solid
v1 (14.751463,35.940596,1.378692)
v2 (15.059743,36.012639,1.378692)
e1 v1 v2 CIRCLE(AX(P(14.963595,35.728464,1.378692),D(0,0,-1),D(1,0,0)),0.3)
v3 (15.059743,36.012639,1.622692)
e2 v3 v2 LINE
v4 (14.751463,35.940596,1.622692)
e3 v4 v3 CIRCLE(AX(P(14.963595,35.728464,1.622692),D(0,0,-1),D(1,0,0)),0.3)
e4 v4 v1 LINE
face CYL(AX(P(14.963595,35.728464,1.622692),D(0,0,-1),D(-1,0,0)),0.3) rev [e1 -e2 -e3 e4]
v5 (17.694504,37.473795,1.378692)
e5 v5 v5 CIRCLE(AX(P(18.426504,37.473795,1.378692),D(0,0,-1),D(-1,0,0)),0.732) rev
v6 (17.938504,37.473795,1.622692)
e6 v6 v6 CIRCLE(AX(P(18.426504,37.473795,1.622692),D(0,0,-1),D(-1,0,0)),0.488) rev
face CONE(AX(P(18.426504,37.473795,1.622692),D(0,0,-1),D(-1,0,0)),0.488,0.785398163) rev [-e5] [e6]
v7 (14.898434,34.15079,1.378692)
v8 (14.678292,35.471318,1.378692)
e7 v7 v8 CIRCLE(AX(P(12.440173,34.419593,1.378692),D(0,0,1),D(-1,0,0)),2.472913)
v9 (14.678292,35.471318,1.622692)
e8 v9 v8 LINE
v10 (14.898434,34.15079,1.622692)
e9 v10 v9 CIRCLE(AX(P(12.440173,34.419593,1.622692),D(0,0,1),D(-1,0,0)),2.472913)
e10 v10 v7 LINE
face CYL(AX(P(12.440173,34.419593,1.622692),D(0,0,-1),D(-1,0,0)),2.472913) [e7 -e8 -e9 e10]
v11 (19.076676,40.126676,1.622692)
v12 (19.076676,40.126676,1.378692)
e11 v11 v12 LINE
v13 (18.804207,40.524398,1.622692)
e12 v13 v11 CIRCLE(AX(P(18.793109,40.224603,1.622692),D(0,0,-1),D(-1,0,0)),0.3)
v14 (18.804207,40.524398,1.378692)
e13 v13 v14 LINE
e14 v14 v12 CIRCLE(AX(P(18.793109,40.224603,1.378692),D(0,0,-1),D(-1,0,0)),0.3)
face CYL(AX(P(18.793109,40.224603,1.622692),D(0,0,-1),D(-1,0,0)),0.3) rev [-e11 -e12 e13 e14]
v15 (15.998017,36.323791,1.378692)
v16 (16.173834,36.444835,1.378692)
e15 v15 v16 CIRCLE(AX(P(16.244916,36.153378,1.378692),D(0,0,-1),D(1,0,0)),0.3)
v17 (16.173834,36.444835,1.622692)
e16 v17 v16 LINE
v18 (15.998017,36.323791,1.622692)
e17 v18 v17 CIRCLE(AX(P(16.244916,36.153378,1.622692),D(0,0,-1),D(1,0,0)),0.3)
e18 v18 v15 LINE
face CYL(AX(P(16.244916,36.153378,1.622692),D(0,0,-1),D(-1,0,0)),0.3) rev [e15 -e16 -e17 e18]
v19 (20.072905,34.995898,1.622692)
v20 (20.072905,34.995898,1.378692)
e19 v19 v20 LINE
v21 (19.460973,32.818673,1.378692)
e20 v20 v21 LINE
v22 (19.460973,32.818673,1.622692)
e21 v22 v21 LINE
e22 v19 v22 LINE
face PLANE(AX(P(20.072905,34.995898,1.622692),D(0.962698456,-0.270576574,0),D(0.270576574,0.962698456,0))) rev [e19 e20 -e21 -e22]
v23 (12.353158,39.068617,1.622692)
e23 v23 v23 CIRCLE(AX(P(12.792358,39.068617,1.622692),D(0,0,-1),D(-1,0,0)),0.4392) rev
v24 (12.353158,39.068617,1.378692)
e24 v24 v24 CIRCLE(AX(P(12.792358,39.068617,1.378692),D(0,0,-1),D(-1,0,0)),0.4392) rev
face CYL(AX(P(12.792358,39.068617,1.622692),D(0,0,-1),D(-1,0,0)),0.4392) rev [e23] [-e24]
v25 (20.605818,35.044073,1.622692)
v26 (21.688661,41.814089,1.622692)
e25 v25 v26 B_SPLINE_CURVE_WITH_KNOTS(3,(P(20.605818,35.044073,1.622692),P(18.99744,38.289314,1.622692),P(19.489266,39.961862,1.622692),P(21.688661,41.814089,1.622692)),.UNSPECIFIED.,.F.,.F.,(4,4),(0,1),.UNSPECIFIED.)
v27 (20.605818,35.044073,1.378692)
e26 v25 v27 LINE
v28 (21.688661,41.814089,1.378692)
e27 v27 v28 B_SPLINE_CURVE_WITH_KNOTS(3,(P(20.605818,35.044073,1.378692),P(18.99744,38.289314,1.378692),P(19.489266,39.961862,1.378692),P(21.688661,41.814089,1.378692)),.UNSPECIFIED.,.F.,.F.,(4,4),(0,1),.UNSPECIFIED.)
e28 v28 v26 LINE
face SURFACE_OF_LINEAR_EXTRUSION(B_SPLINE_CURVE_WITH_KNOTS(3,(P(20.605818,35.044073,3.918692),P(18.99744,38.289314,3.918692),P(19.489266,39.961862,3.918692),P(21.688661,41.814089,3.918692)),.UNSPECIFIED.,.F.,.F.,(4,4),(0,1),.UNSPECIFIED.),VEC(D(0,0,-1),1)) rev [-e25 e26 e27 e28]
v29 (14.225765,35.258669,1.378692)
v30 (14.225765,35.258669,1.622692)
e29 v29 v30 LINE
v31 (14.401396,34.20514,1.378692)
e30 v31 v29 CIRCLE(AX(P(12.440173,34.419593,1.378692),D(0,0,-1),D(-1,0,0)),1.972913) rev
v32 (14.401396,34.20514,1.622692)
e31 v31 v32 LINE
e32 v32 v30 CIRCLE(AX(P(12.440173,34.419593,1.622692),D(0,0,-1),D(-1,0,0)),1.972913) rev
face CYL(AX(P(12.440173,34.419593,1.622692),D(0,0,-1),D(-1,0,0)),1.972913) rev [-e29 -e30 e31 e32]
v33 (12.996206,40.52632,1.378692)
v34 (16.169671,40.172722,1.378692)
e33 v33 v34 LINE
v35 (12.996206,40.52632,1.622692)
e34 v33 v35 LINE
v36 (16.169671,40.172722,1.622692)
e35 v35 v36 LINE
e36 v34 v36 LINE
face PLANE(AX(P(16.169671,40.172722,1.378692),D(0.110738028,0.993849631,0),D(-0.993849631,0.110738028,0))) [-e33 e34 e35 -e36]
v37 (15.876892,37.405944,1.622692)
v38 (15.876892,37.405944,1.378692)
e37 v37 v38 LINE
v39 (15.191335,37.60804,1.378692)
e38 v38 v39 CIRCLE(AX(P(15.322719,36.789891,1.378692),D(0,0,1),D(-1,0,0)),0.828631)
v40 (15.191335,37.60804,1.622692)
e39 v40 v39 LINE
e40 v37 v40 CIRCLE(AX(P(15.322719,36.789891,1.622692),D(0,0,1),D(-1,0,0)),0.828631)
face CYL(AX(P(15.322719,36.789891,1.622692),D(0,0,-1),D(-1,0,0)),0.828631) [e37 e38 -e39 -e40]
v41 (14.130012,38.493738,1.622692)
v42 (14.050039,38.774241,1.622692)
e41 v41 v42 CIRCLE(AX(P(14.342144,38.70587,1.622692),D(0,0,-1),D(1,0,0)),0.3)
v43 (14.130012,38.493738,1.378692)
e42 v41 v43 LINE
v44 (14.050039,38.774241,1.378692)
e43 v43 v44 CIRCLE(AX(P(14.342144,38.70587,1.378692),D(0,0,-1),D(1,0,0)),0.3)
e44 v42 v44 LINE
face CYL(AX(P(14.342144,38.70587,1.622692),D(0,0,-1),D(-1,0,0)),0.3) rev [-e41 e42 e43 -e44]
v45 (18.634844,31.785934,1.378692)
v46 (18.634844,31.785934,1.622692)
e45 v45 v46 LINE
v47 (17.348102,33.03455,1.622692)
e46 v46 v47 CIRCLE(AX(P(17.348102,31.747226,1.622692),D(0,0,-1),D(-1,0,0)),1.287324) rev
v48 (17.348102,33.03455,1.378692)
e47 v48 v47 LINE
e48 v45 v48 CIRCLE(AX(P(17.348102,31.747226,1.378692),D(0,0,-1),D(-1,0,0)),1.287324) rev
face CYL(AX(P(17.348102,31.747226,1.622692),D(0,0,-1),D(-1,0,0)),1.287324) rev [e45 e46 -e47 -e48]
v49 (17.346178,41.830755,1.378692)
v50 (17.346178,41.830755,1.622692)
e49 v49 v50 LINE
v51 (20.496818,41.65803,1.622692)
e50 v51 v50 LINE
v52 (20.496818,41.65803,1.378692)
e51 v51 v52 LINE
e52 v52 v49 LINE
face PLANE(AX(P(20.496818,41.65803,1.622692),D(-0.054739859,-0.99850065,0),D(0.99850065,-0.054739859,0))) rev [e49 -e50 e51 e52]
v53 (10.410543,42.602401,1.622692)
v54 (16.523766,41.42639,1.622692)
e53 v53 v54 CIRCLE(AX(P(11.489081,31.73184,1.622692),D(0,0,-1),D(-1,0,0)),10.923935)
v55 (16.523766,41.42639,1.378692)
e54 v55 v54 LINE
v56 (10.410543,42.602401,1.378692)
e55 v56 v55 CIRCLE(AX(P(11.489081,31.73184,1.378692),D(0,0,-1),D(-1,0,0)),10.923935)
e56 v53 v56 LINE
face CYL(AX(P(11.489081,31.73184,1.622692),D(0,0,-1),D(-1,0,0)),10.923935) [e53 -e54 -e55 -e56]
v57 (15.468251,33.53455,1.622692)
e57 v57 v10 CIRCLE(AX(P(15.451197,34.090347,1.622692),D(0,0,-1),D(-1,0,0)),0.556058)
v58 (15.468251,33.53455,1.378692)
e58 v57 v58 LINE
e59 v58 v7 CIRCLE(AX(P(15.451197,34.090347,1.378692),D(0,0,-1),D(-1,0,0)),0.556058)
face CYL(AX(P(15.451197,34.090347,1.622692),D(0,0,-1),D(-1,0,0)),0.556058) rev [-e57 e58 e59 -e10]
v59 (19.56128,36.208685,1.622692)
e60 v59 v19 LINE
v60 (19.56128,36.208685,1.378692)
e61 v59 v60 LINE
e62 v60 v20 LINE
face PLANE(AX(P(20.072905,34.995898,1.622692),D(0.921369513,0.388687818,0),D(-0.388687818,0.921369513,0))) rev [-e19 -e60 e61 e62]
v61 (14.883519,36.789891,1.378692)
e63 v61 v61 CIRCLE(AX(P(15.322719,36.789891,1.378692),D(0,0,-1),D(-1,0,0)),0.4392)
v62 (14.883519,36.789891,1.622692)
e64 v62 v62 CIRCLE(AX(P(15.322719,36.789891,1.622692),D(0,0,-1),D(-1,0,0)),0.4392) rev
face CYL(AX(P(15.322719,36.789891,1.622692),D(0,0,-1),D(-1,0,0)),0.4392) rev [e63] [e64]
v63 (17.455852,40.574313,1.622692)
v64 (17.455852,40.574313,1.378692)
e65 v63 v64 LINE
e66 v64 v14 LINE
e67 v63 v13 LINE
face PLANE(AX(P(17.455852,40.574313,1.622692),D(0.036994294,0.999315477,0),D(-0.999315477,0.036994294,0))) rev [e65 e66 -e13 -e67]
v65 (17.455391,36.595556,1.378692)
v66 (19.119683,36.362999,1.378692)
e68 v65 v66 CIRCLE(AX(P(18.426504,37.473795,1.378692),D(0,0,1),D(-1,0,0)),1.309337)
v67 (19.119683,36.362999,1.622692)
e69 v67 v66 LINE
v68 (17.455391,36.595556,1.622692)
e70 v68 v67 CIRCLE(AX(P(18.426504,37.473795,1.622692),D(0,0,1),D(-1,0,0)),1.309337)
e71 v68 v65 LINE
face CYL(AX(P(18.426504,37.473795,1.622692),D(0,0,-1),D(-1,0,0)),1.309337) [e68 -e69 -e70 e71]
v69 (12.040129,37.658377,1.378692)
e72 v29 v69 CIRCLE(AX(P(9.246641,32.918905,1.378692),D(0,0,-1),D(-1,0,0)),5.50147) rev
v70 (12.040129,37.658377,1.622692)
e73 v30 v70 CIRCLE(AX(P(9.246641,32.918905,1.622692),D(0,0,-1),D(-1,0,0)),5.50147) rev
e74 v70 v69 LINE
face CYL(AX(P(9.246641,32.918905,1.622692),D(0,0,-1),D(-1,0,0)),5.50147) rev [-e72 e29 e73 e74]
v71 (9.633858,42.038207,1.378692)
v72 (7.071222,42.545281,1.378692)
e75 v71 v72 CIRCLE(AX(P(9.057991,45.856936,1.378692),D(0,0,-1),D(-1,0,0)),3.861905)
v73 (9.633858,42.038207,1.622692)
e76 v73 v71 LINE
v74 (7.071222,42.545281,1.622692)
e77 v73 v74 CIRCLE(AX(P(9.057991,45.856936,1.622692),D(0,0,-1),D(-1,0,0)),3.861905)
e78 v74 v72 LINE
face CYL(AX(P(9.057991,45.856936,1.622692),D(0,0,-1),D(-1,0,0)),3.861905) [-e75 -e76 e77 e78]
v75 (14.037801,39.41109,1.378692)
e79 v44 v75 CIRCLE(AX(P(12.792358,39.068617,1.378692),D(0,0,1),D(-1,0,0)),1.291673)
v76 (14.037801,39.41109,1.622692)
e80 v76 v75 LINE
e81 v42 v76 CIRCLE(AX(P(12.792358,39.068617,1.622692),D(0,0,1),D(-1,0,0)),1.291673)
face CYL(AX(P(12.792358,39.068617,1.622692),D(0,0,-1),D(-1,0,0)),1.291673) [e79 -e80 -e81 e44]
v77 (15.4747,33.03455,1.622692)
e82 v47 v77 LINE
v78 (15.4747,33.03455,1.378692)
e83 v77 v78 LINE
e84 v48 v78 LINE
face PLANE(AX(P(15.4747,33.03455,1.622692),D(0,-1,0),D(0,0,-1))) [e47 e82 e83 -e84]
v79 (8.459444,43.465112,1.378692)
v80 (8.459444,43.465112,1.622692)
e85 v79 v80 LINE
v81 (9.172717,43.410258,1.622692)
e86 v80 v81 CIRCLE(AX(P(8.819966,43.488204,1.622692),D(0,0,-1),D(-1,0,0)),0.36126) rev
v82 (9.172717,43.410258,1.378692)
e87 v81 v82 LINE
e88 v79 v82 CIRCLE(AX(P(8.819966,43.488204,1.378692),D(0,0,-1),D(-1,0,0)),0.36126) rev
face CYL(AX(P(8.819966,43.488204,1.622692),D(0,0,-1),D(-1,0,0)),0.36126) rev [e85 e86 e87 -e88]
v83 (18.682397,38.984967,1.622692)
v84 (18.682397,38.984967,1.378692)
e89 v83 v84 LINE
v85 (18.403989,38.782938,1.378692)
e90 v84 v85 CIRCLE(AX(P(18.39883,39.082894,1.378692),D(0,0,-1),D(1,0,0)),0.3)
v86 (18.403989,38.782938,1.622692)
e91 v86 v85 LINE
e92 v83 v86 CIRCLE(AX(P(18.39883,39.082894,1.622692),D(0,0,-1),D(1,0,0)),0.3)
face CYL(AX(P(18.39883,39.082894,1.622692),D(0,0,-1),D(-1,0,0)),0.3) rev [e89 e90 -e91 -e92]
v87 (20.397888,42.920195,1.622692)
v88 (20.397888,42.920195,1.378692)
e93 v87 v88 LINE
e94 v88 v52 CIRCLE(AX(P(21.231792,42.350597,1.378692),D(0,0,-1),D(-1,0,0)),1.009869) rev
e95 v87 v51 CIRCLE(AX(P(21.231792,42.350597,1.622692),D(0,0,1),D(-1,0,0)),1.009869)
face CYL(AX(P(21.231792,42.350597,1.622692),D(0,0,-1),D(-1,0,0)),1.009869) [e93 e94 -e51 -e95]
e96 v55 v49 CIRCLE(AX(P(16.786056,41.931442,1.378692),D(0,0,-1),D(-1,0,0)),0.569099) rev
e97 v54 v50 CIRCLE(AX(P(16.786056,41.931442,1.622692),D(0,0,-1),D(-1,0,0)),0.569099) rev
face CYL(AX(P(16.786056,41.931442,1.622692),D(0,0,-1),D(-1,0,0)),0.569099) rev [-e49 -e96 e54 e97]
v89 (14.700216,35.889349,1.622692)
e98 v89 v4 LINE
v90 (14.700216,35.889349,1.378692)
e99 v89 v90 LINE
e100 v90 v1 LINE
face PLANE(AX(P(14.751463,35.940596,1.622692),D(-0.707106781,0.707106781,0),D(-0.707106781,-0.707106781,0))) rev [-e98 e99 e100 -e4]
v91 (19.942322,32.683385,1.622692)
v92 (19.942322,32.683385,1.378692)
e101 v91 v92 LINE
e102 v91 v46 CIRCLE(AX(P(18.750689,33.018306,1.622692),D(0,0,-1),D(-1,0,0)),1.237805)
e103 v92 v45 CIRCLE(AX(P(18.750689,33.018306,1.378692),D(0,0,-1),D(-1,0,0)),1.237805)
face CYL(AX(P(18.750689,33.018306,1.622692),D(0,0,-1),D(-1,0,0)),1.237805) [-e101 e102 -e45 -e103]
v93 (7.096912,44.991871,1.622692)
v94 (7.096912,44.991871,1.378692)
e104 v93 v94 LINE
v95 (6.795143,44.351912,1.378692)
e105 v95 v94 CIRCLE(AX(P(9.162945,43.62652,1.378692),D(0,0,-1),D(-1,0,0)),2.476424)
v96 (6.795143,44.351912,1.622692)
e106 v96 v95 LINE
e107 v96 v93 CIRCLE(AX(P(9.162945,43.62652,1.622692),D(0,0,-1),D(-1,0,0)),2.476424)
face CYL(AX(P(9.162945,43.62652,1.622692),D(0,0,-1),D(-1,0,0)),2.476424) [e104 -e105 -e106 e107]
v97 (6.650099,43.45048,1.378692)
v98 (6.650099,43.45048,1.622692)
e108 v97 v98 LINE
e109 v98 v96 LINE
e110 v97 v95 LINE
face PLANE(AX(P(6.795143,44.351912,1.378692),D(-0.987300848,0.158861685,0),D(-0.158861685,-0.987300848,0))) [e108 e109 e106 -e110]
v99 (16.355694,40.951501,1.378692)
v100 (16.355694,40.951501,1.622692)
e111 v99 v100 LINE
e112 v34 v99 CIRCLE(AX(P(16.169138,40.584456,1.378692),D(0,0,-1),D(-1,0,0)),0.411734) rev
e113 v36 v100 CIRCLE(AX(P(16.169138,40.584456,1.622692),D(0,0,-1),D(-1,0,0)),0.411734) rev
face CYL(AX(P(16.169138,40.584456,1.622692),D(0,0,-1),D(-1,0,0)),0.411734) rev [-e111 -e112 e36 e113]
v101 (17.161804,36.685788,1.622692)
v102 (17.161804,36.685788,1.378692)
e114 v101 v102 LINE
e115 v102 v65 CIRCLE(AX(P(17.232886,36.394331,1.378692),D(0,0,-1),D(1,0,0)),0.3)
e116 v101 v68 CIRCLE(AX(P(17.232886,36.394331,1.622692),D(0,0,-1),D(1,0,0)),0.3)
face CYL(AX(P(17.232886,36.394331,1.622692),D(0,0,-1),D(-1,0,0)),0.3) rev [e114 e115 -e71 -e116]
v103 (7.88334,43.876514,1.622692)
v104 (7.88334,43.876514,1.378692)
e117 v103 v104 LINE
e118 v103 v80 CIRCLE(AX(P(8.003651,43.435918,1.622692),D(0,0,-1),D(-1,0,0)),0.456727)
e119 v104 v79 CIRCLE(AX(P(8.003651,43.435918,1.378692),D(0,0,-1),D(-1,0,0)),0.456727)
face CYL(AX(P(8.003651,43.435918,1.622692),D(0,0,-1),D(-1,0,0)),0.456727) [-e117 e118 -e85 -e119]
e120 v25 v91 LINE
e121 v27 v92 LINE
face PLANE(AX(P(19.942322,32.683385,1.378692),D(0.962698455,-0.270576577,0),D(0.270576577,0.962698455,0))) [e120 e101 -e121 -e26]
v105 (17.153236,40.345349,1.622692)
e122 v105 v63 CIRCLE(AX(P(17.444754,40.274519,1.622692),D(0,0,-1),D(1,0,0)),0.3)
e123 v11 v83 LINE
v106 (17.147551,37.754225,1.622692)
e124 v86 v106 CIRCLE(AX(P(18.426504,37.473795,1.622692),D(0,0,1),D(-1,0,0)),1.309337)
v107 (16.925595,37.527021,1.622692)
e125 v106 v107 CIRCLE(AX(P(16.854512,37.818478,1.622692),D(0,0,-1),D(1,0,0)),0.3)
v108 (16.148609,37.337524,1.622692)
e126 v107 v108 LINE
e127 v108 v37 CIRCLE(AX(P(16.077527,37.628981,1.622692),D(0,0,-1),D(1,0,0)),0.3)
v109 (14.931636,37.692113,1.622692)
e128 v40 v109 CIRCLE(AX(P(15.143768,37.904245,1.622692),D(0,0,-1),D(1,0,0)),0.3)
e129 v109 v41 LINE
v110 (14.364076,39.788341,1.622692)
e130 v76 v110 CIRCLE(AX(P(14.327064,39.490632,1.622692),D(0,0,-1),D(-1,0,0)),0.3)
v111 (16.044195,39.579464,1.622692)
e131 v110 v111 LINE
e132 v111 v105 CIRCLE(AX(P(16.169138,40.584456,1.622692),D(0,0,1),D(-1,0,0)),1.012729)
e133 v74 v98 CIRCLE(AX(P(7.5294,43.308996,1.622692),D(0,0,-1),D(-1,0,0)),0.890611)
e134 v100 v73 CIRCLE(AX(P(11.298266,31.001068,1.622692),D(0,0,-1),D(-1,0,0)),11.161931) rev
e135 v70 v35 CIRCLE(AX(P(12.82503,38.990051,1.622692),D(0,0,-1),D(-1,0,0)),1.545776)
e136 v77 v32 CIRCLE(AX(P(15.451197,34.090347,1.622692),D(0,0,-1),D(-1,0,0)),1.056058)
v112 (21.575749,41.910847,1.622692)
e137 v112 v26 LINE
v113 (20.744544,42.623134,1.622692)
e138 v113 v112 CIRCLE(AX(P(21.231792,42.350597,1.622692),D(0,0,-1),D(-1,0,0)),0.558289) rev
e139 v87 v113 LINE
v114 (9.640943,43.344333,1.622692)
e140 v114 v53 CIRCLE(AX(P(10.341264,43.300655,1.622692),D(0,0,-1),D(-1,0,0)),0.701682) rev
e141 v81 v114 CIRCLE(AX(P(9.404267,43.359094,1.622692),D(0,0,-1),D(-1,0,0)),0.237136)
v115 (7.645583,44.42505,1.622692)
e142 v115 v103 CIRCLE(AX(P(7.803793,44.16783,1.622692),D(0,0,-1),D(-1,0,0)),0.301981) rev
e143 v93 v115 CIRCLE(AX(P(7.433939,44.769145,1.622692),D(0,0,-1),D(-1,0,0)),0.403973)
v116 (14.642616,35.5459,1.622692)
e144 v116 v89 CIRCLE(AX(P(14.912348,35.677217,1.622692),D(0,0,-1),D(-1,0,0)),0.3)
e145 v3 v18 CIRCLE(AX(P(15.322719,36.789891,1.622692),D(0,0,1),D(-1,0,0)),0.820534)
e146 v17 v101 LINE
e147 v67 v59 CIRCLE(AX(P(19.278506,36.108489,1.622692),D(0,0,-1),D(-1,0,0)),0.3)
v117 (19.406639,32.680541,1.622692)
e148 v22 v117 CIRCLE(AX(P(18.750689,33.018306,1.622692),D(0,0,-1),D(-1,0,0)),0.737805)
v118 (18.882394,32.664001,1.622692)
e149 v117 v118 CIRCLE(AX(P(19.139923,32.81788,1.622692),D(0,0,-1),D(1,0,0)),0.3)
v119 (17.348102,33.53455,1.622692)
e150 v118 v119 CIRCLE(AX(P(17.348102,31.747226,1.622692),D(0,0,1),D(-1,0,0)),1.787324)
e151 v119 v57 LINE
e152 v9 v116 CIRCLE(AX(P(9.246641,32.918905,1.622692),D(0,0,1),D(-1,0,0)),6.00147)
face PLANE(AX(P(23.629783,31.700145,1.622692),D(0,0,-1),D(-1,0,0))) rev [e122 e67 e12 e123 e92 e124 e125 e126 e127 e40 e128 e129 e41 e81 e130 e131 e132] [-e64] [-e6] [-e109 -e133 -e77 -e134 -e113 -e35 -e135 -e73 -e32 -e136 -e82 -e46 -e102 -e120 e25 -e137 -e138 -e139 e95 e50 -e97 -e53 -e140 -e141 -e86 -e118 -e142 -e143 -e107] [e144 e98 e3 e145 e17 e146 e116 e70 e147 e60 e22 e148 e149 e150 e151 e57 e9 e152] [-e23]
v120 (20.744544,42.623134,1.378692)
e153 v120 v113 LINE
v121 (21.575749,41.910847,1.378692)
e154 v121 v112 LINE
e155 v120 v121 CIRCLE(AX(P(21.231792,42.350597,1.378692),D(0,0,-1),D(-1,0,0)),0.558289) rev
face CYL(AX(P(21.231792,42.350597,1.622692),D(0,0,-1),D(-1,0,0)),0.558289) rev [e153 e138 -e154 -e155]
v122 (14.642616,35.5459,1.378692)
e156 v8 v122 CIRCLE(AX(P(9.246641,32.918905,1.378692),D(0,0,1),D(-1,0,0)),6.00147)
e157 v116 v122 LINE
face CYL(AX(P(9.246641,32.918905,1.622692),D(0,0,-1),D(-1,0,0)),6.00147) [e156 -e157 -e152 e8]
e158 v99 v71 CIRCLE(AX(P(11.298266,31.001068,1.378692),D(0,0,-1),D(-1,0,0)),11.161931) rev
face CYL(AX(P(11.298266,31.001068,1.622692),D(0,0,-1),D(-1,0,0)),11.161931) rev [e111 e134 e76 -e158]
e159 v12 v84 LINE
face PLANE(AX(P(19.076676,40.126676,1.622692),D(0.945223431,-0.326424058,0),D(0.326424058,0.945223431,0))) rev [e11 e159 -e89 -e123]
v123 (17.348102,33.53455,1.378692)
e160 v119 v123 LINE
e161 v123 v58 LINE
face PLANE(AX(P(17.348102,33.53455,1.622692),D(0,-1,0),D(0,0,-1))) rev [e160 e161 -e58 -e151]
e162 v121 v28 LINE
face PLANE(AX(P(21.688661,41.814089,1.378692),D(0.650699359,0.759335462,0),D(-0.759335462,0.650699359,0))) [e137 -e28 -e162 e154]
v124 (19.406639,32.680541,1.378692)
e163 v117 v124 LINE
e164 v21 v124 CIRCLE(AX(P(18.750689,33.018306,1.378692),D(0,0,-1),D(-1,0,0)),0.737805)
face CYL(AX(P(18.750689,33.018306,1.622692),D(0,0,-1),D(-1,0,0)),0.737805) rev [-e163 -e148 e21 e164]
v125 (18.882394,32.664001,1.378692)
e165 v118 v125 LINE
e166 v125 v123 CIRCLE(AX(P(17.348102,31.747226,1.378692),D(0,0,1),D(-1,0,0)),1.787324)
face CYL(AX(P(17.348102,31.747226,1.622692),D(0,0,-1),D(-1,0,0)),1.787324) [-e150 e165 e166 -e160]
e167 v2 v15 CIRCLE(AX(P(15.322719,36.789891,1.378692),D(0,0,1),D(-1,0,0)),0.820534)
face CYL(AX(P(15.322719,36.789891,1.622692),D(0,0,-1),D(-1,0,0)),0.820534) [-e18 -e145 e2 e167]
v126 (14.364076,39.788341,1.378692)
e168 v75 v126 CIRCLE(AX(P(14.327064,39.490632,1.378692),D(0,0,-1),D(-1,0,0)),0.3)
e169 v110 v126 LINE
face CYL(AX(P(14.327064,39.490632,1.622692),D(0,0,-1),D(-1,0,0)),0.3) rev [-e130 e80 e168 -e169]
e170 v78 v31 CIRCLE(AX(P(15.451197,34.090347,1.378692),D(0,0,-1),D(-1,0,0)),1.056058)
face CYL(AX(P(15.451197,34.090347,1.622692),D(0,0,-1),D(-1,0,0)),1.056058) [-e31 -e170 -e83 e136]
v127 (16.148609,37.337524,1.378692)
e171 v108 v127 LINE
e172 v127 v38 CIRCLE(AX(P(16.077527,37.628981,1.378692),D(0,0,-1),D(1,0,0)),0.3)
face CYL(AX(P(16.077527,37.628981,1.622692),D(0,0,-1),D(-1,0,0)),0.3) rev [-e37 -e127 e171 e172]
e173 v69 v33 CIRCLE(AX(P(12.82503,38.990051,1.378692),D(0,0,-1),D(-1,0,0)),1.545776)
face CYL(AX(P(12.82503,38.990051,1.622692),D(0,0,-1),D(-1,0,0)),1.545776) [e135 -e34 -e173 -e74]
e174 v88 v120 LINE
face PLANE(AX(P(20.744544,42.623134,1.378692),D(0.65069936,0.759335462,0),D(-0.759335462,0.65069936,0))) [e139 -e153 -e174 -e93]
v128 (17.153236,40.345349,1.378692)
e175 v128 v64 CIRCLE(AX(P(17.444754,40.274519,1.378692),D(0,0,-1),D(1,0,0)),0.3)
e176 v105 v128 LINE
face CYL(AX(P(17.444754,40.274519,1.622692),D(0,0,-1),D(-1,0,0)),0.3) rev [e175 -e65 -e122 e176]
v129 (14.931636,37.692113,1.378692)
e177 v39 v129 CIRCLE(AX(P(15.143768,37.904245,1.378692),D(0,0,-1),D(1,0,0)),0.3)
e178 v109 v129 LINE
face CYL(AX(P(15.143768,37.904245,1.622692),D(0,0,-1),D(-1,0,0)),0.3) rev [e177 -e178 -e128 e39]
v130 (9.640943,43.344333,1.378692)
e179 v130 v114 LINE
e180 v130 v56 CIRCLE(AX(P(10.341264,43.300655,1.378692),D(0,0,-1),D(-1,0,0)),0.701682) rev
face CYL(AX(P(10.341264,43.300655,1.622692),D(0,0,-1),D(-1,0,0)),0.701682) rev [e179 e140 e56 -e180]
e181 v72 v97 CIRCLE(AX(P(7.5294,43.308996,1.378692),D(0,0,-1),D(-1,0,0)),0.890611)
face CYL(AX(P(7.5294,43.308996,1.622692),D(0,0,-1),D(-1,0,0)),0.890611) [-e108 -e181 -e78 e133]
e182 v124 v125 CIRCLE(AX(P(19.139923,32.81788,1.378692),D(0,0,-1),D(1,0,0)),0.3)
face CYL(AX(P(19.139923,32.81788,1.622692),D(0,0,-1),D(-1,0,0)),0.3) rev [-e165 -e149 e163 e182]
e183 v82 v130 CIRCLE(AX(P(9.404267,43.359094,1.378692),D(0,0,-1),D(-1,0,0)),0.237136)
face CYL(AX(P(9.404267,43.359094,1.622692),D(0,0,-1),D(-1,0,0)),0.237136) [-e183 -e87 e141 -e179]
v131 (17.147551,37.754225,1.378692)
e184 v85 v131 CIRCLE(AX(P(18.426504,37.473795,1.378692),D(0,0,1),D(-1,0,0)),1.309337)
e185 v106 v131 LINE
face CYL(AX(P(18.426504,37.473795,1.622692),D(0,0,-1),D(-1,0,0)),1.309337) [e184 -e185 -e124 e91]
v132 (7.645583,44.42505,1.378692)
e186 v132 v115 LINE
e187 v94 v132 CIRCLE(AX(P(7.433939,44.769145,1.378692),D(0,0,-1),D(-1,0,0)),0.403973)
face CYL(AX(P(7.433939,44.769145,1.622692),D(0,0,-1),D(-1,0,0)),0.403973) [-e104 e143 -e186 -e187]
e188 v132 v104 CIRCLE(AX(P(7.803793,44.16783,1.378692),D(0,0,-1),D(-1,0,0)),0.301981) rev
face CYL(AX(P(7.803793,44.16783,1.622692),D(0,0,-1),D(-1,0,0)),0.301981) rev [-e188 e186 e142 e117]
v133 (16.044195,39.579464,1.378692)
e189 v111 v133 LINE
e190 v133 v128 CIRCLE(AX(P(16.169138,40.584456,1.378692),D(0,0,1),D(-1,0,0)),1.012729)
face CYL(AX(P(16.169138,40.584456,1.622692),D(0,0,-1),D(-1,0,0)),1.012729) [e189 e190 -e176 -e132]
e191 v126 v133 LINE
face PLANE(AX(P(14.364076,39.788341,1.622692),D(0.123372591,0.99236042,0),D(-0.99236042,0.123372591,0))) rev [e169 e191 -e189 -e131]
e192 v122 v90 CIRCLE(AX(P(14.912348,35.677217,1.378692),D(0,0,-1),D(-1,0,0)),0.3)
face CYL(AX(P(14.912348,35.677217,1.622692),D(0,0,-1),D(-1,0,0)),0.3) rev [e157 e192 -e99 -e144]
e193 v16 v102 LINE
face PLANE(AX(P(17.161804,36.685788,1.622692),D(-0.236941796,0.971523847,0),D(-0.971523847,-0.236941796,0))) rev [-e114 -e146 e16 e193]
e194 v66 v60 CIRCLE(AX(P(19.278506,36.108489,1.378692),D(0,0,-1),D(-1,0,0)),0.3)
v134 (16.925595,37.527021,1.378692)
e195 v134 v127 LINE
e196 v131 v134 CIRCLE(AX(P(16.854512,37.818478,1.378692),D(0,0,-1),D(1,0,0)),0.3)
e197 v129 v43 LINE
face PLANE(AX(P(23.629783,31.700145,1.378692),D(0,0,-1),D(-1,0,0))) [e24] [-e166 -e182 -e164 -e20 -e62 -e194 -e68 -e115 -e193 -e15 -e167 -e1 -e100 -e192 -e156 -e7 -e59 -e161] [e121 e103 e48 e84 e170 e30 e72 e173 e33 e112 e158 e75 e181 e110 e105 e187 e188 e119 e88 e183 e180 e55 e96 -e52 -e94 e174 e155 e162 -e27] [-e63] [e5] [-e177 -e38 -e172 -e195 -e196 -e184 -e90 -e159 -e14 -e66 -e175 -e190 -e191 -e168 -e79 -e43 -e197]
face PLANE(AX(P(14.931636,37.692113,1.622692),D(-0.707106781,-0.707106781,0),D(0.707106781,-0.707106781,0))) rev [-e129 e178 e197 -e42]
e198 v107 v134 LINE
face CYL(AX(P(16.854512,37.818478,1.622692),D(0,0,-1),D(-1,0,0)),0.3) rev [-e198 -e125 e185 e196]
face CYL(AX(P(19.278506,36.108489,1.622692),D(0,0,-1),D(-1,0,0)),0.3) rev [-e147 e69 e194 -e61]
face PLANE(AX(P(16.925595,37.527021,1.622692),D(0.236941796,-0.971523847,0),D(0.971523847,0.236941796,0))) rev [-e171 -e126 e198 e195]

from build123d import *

# Parameters (mm, degrees)
SCALE1_START       = 1.378692074
SCALE1_OUTLINE_R   = 0.4392
SCALE1_DEPTH       = 0.244
CUT_EXTRUDE1_DEPTH = 2.54
CUT_EXTRUDE2_DEPTH = 51.110559093
CUT_EXTRUDE3_DEPTH = 51.110559093
CUT_EXTRUDE4_DEPTH = 51.110559093


with BuildPart() as part:
    # Scale1: read off the stored shape, not the designer's step
    # Scale1 outline → Scale1 (new body)
    with BuildSketch(Plane.XY.offset(SCALE1_START)):
        with BuildLine():
            Line((17.68301566, 43.704577473), (17.346177673, 41.830755017))
            ThreePointArc((17.346177673, 41.830755017), (17.037161165, 41.420736581), (16.523766226, 41.426389643))
            ThreePointArc((16.523766226, 41.426389643), (13.552700425, 42.459086685), (10.410542545, 42.602401154))
            ThreePointArc((10.410542545, 42.602401154), (9.854263516, 42.795493333), (9.640942513, 43.344333108))
            ThreePointArc((9.640942513, 43.344333108), (9.437328912, 43.59391361), (9.172716599, 43.410258363))
            ThreePointArc((9.172716599, 43.410258363), (8.792265037, 43.128007225), (8.459444481, 43.465111917))
            ThreePointArc((8.459444481, 43.465111917), (8.269075619, 43.807602921), (7.883340454, 43.876514268))
            ThreePointArc((7.883340454, 43.876514268), (7.526718951, 44.047734987), (7.645582772, 44.425050271))
            ThreePointArc((7.645582772, 44.425050271), (7.724200076, 45.050111764), (7.096911805, 44.991871103))
            ThreePointArc((7.096911805, 44.991871103), (6.923054486, 44.682724324), (6.79514349, 44.351911876))
            Line((6.79514349, 44.351911876), (6.650098626, 43.450480425))
            ThreePointArc((6.650098626, 43.450480425), (6.721898103, 42.933324679), (7.071222107, 42.545280904))
            ThreePointArc((7.071222107, 42.545280904), (8.30836308, 42.068484056), (9.633857836, 42.038207468))
            ThreePointArc((9.633857836, 42.038207468), (13.079663737, 42.019930147), (16.355693709, 40.951501394))
            ThreePointArc((16.355693709, 40.951501394), (16.569606698, 40.488798349), (16.169670974, 40.172721944))
            Line((16.169670974, 40.172721944), (12.996206362, 40.526319917))
            ThreePointArc((12.996206362, 40.526319917), (11.358592721, 39.478912268), (12.040129402, 37.658376915))
            ThreePointArc((12.040129402, 37.658376915), (13.31395276, 36.623381651), (14.225764982, 35.258669367))
            ThreePointArc((14.225764982, 35.258669367), (14.386229966, 34.744015637), (14.401396414, 34.205139535))
            ThreePointArc((14.401396414, 34.205139535), (14.672806749, 33.376647317), (15.474699865, 33.034550319))
            Line((15.474699865, 33.034550319), (17.348101609, 33.034550317))
            ThreePointArc((17.348101609, 33.034550317), (18.244587572, 32.671085647), (18.634843629, 31.785933762))
            ThreePointArc((18.634843629, 31.785933762), (19.451177789, 31.997778319), (19.942322167, 32.683385187))
            Line((19.942322167, 32.683385187), (21.269314636, 37.404760613))
            ThreePointArc((21.269314636, 37.404760613), (21.73439895, 38.387008616), (22.497682404, 39.16064479))
            Line((22.497682404, 39.16064479), (23.128103851, 39.765569271))
            ThreePointArc((23.128103851, 39.765569271), (23.52490002, 40.486669007), (23.253920075, 41.263844598))
            Line((23.253920075, 41.263844598), (22.452558823, 42.115876451))
            ThreePointArc((22.452558823, 42.115876451), (22.115289154, 42.23834678), (21.816559174, 42.039575025))
            Line((21.816559174, 42.039575025), (21.688661164, 41.814089241))
            Line((21.688661164, 41.814089241), (21.575749212, 41.910847183))
            ThreePointArc((21.575749212, 41.910847183), (20.868513286, 41.926668482), (20.744543825, 42.623134233))
            Line((20.744543825, 42.623134233), (18.940412338, 44.169153428))
            ThreePointArc((18.940412338, 44.169153428), (18.175234277, 44.306254238), (17.68301566, 43.704577473))
        make_face()
        with Locations((15.322718522, 36.789890957)):
            Circle(SCALE1_OUTLINE_R, mode=Mode.SUBTRACT)
        with Locations((12.792357561, 39.068616569)):
            Circle(SCALE1_OUTLINE_R, mode=Mode.SUBTRACT)
    extrude(amount=SCALE1_DEPTH)

    # Scale1 2 outline → Scale1 2 (revolve, cut)
    with BuildSketch(Plane(origin=(18.426504279, 37.473794578, 0), x_dir=(1, 0, 0), z_dir=(0, -1, 0))):
        Polygon((0, 1.378692074), (0.732, 1.378692074), (0.488, 1.622692074), (0, 1.622692074), align=None)
    revolve(axis=Axis((18.426504279, 37.473794578, 0), (0, 0, 1)), mode=Mode.SUBTRACT)

    # Sketch1 → Cut-Extrude1 (cut)
    with BuildSketch(Plane(origin=(0, 0, 1.378692074), x_dir=(-1, 0, 0), z_dir=(0, 0, -1))):
        with BuildLine():
            Line((-21.688661166, 41.81408924), (-21.982980789, 42.999564373))
            Line((-21.982980789, 42.999564373), (-25.421126936, 39.405059446))
            Line((-25.421126936, 39.405059446), (-20.605818398, 35.044072901))
            add(Edge.make_bspline(
                [(-21.688661166, 41.81408924), (-19.489266143, 39.961862231), (-18.997440369, 38.289314262), (-20.605818398, 35.044072901)],
                knots=[0, 0, 0, 0, 1, 1, 1, 1], degree=3))
        make_face()
    extrude(amount=-CUT_EXTRUDE1_DEPTH, mode=Mode.SUBTRACT)

    # Sketch2 → Cut-Extrude2 (cut, through all)
    with BuildSketch(Plane(origin=(0, 0, 1.378692074), x_dir=(-1, 0, 0), z_dir=(0, 0, -1))):
        with BuildLine():
            Line((-17.348101609, 33.534550318), (-15.46825055, 33.534550318))
            ThreePointArc((-15.46825055, 33.534550318), (-15.042927497, 33.712833322), (-14.89843377, 34.150790045))
            ThreePointArc((-14.89843377, 34.150790045), (-14.879423654, 34.826234772), (-14.678291655, 35.471318396))
            ThreePointArc((-14.678291655, 35.471318396), (-14.660582055, 35.508670476), (-14.642615597, 35.545899689))
            ThreePointArc((-14.642615597, 35.545899689), (-14.616480362, 35.726837837), (-14.700216201, 35.889349293))
            Line((-14.700216201, 35.889349293), (-14.751462797, 35.940595889))
            ThreePointArc((-14.751462797, 35.940595889), (-14.895326012, 36.020592881), (-15.059742801, 36.012639096))
            ThreePointArc((-15.059742801, 36.012639096), (-15.580994431, 36.011064763), (-15.998016925, 36.323791449))
            ThreePointArc((-15.998016925, 36.323791449), (-16.074795707, 36.400479379), (-16.173833875, 36.44483545))
            Line((-16.173833875, 36.44483545), (-17.161803556, 36.685788167))
            ThreePointArc((-17.161803556, 36.685788167), (-17.321020312, 36.681092865), (-17.455391032, 36.595556142))
            ThreePointArc((-17.455391032, 36.595556142), (-18.245306435, 36.177055965), (-19.119682785, 36.362998806))
            ThreePointArc((-19.119682785, 36.362998806), (-19.377471249, 36.391695847), (-19.561279678, 36.208685263))
            Line((-19.561279678, 36.208685263), (-20.072904791, 34.995897621))
            Line((-20.072904791, 34.995897621), (-19.460972938, 32.818673477))
            ThreePointArc((-19.460972938, 32.818673477), (-19.437288786, 32.748237282), (-19.40663946, 32.680540786))
            ThreePointArc((-19.40663946, 32.680540786), (-19.149382906, 32.518029269), (-18.882393628, 32.66400068))
            ThreePointArc((-18.882393628, 32.66400068), (-18.230131749, 33.301751954), (-17.348101609, 33.534550318))
        make_face()
    extrude(amount=-CUT_EXTRUDE2_DEPTH, mode=Mode.SUBTRACT)

    # Sketch3 → Cut-Extrude3 (cut, through all)
    with BuildSketch(Plane(origin=(0, 0, 1.378692074), x_dir=(-1, 0, 0), z_dir=(0, 0, -1))):
        with BuildLine():
            Line((-20.496817758, 41.658030449), (-17.346177676, 41.830755017))
            Line((-17.346177676, 41.830755017), (-17.346177676, 45.415633963))
            Line((-17.346177676, 45.415633963), (-20.923893138, 43.312384261))
            ThreePointArc((-20.923893138, 43.312384261), (-20.253979171, 42.603021979), (-20.496817758, 41.658030449))
        make_face()
    extrude(amount=-CUT_EXTRUDE3_DEPTH, mode=Mode.SUBTRACT)

    # Sketch4 → Cut-Extrude4 (cut, through all)
    with BuildSketch(Plane(origin=(0, 0, 1.378692074), x_dir=(-1, 0, 0), z_dir=(0, 0, -1))):
        with BuildLine():
            Line((-17.455852383, 40.574313146), (-18.8042073, 40.524397539))
            ThreePointArc((-18.8042073, 40.524397539), (-19.040601602, 40.394153532), (-19.076676041, 40.126675679))
            Line((-19.076676041, 40.126675679), (-18.682397479, 38.984966524))
            ThreePointArc((-18.682397479, 38.984966524), (-18.575024983, 38.840086232), (-18.403989188, 38.782938099))
            ThreePointArc((-18.403989188, 38.782938099), (-17.597035683, 38.48688171), (-17.14755053, 37.754224599))
            ThreePointArc((-17.14755053, 37.754224599), (-17.069108072, 37.608838613), (-16.925594615, 37.527020573))
            Line((-16.925594615, 37.527020573), (-16.148609211, 37.337524127))
            ThreePointArc((-16.148609211, 37.337524127), (-16.00427201, 37.33806247), (-15.876892057, 37.405943726))
            ThreePointArc((-15.876892057, 37.405943726), (-15.557022892, 37.584705893), (-15.191334883, 37.60803988))
            ThreePointArc((-15.191334883, 37.60803988), (-15.051369663, 37.618828593), (-14.931636329, 37.692112887))
            Line((-14.931636329, 37.692112887), (-14.130011628, 38.493737588))
            ThreePointArc((-14.130011628, 38.493737588), (-14.053640182, 38.623615493), (-14.050038507, 38.774240511))
            ThreePointArc((-14.050038507, 38.774240511), (-14.083791972, 39.093431642), (-14.037801355, 39.411090481))
            ThreePointArc((-14.037801355, 39.411090481), (-14.100156714, 39.686879536), (-14.364076124, 39.788340557))
            Line((-14.364076124, 39.788340557), (-16.044195491, 39.579464149))
            ThreePointArc((-16.044195491, 39.579464149), (-16.744622059, 39.75112655), (-17.15323559, 40.345349015))
            ThreePointArc((-17.15323559, 40.345349015), (-17.263742997, 40.513756841), (-17.455852383, 40.574313146))
        make_face()
    extrude(amount=-CUT_EXTRUDE4_DEPTH, mode=Mode.SUBTRACT)


solid = part.part
